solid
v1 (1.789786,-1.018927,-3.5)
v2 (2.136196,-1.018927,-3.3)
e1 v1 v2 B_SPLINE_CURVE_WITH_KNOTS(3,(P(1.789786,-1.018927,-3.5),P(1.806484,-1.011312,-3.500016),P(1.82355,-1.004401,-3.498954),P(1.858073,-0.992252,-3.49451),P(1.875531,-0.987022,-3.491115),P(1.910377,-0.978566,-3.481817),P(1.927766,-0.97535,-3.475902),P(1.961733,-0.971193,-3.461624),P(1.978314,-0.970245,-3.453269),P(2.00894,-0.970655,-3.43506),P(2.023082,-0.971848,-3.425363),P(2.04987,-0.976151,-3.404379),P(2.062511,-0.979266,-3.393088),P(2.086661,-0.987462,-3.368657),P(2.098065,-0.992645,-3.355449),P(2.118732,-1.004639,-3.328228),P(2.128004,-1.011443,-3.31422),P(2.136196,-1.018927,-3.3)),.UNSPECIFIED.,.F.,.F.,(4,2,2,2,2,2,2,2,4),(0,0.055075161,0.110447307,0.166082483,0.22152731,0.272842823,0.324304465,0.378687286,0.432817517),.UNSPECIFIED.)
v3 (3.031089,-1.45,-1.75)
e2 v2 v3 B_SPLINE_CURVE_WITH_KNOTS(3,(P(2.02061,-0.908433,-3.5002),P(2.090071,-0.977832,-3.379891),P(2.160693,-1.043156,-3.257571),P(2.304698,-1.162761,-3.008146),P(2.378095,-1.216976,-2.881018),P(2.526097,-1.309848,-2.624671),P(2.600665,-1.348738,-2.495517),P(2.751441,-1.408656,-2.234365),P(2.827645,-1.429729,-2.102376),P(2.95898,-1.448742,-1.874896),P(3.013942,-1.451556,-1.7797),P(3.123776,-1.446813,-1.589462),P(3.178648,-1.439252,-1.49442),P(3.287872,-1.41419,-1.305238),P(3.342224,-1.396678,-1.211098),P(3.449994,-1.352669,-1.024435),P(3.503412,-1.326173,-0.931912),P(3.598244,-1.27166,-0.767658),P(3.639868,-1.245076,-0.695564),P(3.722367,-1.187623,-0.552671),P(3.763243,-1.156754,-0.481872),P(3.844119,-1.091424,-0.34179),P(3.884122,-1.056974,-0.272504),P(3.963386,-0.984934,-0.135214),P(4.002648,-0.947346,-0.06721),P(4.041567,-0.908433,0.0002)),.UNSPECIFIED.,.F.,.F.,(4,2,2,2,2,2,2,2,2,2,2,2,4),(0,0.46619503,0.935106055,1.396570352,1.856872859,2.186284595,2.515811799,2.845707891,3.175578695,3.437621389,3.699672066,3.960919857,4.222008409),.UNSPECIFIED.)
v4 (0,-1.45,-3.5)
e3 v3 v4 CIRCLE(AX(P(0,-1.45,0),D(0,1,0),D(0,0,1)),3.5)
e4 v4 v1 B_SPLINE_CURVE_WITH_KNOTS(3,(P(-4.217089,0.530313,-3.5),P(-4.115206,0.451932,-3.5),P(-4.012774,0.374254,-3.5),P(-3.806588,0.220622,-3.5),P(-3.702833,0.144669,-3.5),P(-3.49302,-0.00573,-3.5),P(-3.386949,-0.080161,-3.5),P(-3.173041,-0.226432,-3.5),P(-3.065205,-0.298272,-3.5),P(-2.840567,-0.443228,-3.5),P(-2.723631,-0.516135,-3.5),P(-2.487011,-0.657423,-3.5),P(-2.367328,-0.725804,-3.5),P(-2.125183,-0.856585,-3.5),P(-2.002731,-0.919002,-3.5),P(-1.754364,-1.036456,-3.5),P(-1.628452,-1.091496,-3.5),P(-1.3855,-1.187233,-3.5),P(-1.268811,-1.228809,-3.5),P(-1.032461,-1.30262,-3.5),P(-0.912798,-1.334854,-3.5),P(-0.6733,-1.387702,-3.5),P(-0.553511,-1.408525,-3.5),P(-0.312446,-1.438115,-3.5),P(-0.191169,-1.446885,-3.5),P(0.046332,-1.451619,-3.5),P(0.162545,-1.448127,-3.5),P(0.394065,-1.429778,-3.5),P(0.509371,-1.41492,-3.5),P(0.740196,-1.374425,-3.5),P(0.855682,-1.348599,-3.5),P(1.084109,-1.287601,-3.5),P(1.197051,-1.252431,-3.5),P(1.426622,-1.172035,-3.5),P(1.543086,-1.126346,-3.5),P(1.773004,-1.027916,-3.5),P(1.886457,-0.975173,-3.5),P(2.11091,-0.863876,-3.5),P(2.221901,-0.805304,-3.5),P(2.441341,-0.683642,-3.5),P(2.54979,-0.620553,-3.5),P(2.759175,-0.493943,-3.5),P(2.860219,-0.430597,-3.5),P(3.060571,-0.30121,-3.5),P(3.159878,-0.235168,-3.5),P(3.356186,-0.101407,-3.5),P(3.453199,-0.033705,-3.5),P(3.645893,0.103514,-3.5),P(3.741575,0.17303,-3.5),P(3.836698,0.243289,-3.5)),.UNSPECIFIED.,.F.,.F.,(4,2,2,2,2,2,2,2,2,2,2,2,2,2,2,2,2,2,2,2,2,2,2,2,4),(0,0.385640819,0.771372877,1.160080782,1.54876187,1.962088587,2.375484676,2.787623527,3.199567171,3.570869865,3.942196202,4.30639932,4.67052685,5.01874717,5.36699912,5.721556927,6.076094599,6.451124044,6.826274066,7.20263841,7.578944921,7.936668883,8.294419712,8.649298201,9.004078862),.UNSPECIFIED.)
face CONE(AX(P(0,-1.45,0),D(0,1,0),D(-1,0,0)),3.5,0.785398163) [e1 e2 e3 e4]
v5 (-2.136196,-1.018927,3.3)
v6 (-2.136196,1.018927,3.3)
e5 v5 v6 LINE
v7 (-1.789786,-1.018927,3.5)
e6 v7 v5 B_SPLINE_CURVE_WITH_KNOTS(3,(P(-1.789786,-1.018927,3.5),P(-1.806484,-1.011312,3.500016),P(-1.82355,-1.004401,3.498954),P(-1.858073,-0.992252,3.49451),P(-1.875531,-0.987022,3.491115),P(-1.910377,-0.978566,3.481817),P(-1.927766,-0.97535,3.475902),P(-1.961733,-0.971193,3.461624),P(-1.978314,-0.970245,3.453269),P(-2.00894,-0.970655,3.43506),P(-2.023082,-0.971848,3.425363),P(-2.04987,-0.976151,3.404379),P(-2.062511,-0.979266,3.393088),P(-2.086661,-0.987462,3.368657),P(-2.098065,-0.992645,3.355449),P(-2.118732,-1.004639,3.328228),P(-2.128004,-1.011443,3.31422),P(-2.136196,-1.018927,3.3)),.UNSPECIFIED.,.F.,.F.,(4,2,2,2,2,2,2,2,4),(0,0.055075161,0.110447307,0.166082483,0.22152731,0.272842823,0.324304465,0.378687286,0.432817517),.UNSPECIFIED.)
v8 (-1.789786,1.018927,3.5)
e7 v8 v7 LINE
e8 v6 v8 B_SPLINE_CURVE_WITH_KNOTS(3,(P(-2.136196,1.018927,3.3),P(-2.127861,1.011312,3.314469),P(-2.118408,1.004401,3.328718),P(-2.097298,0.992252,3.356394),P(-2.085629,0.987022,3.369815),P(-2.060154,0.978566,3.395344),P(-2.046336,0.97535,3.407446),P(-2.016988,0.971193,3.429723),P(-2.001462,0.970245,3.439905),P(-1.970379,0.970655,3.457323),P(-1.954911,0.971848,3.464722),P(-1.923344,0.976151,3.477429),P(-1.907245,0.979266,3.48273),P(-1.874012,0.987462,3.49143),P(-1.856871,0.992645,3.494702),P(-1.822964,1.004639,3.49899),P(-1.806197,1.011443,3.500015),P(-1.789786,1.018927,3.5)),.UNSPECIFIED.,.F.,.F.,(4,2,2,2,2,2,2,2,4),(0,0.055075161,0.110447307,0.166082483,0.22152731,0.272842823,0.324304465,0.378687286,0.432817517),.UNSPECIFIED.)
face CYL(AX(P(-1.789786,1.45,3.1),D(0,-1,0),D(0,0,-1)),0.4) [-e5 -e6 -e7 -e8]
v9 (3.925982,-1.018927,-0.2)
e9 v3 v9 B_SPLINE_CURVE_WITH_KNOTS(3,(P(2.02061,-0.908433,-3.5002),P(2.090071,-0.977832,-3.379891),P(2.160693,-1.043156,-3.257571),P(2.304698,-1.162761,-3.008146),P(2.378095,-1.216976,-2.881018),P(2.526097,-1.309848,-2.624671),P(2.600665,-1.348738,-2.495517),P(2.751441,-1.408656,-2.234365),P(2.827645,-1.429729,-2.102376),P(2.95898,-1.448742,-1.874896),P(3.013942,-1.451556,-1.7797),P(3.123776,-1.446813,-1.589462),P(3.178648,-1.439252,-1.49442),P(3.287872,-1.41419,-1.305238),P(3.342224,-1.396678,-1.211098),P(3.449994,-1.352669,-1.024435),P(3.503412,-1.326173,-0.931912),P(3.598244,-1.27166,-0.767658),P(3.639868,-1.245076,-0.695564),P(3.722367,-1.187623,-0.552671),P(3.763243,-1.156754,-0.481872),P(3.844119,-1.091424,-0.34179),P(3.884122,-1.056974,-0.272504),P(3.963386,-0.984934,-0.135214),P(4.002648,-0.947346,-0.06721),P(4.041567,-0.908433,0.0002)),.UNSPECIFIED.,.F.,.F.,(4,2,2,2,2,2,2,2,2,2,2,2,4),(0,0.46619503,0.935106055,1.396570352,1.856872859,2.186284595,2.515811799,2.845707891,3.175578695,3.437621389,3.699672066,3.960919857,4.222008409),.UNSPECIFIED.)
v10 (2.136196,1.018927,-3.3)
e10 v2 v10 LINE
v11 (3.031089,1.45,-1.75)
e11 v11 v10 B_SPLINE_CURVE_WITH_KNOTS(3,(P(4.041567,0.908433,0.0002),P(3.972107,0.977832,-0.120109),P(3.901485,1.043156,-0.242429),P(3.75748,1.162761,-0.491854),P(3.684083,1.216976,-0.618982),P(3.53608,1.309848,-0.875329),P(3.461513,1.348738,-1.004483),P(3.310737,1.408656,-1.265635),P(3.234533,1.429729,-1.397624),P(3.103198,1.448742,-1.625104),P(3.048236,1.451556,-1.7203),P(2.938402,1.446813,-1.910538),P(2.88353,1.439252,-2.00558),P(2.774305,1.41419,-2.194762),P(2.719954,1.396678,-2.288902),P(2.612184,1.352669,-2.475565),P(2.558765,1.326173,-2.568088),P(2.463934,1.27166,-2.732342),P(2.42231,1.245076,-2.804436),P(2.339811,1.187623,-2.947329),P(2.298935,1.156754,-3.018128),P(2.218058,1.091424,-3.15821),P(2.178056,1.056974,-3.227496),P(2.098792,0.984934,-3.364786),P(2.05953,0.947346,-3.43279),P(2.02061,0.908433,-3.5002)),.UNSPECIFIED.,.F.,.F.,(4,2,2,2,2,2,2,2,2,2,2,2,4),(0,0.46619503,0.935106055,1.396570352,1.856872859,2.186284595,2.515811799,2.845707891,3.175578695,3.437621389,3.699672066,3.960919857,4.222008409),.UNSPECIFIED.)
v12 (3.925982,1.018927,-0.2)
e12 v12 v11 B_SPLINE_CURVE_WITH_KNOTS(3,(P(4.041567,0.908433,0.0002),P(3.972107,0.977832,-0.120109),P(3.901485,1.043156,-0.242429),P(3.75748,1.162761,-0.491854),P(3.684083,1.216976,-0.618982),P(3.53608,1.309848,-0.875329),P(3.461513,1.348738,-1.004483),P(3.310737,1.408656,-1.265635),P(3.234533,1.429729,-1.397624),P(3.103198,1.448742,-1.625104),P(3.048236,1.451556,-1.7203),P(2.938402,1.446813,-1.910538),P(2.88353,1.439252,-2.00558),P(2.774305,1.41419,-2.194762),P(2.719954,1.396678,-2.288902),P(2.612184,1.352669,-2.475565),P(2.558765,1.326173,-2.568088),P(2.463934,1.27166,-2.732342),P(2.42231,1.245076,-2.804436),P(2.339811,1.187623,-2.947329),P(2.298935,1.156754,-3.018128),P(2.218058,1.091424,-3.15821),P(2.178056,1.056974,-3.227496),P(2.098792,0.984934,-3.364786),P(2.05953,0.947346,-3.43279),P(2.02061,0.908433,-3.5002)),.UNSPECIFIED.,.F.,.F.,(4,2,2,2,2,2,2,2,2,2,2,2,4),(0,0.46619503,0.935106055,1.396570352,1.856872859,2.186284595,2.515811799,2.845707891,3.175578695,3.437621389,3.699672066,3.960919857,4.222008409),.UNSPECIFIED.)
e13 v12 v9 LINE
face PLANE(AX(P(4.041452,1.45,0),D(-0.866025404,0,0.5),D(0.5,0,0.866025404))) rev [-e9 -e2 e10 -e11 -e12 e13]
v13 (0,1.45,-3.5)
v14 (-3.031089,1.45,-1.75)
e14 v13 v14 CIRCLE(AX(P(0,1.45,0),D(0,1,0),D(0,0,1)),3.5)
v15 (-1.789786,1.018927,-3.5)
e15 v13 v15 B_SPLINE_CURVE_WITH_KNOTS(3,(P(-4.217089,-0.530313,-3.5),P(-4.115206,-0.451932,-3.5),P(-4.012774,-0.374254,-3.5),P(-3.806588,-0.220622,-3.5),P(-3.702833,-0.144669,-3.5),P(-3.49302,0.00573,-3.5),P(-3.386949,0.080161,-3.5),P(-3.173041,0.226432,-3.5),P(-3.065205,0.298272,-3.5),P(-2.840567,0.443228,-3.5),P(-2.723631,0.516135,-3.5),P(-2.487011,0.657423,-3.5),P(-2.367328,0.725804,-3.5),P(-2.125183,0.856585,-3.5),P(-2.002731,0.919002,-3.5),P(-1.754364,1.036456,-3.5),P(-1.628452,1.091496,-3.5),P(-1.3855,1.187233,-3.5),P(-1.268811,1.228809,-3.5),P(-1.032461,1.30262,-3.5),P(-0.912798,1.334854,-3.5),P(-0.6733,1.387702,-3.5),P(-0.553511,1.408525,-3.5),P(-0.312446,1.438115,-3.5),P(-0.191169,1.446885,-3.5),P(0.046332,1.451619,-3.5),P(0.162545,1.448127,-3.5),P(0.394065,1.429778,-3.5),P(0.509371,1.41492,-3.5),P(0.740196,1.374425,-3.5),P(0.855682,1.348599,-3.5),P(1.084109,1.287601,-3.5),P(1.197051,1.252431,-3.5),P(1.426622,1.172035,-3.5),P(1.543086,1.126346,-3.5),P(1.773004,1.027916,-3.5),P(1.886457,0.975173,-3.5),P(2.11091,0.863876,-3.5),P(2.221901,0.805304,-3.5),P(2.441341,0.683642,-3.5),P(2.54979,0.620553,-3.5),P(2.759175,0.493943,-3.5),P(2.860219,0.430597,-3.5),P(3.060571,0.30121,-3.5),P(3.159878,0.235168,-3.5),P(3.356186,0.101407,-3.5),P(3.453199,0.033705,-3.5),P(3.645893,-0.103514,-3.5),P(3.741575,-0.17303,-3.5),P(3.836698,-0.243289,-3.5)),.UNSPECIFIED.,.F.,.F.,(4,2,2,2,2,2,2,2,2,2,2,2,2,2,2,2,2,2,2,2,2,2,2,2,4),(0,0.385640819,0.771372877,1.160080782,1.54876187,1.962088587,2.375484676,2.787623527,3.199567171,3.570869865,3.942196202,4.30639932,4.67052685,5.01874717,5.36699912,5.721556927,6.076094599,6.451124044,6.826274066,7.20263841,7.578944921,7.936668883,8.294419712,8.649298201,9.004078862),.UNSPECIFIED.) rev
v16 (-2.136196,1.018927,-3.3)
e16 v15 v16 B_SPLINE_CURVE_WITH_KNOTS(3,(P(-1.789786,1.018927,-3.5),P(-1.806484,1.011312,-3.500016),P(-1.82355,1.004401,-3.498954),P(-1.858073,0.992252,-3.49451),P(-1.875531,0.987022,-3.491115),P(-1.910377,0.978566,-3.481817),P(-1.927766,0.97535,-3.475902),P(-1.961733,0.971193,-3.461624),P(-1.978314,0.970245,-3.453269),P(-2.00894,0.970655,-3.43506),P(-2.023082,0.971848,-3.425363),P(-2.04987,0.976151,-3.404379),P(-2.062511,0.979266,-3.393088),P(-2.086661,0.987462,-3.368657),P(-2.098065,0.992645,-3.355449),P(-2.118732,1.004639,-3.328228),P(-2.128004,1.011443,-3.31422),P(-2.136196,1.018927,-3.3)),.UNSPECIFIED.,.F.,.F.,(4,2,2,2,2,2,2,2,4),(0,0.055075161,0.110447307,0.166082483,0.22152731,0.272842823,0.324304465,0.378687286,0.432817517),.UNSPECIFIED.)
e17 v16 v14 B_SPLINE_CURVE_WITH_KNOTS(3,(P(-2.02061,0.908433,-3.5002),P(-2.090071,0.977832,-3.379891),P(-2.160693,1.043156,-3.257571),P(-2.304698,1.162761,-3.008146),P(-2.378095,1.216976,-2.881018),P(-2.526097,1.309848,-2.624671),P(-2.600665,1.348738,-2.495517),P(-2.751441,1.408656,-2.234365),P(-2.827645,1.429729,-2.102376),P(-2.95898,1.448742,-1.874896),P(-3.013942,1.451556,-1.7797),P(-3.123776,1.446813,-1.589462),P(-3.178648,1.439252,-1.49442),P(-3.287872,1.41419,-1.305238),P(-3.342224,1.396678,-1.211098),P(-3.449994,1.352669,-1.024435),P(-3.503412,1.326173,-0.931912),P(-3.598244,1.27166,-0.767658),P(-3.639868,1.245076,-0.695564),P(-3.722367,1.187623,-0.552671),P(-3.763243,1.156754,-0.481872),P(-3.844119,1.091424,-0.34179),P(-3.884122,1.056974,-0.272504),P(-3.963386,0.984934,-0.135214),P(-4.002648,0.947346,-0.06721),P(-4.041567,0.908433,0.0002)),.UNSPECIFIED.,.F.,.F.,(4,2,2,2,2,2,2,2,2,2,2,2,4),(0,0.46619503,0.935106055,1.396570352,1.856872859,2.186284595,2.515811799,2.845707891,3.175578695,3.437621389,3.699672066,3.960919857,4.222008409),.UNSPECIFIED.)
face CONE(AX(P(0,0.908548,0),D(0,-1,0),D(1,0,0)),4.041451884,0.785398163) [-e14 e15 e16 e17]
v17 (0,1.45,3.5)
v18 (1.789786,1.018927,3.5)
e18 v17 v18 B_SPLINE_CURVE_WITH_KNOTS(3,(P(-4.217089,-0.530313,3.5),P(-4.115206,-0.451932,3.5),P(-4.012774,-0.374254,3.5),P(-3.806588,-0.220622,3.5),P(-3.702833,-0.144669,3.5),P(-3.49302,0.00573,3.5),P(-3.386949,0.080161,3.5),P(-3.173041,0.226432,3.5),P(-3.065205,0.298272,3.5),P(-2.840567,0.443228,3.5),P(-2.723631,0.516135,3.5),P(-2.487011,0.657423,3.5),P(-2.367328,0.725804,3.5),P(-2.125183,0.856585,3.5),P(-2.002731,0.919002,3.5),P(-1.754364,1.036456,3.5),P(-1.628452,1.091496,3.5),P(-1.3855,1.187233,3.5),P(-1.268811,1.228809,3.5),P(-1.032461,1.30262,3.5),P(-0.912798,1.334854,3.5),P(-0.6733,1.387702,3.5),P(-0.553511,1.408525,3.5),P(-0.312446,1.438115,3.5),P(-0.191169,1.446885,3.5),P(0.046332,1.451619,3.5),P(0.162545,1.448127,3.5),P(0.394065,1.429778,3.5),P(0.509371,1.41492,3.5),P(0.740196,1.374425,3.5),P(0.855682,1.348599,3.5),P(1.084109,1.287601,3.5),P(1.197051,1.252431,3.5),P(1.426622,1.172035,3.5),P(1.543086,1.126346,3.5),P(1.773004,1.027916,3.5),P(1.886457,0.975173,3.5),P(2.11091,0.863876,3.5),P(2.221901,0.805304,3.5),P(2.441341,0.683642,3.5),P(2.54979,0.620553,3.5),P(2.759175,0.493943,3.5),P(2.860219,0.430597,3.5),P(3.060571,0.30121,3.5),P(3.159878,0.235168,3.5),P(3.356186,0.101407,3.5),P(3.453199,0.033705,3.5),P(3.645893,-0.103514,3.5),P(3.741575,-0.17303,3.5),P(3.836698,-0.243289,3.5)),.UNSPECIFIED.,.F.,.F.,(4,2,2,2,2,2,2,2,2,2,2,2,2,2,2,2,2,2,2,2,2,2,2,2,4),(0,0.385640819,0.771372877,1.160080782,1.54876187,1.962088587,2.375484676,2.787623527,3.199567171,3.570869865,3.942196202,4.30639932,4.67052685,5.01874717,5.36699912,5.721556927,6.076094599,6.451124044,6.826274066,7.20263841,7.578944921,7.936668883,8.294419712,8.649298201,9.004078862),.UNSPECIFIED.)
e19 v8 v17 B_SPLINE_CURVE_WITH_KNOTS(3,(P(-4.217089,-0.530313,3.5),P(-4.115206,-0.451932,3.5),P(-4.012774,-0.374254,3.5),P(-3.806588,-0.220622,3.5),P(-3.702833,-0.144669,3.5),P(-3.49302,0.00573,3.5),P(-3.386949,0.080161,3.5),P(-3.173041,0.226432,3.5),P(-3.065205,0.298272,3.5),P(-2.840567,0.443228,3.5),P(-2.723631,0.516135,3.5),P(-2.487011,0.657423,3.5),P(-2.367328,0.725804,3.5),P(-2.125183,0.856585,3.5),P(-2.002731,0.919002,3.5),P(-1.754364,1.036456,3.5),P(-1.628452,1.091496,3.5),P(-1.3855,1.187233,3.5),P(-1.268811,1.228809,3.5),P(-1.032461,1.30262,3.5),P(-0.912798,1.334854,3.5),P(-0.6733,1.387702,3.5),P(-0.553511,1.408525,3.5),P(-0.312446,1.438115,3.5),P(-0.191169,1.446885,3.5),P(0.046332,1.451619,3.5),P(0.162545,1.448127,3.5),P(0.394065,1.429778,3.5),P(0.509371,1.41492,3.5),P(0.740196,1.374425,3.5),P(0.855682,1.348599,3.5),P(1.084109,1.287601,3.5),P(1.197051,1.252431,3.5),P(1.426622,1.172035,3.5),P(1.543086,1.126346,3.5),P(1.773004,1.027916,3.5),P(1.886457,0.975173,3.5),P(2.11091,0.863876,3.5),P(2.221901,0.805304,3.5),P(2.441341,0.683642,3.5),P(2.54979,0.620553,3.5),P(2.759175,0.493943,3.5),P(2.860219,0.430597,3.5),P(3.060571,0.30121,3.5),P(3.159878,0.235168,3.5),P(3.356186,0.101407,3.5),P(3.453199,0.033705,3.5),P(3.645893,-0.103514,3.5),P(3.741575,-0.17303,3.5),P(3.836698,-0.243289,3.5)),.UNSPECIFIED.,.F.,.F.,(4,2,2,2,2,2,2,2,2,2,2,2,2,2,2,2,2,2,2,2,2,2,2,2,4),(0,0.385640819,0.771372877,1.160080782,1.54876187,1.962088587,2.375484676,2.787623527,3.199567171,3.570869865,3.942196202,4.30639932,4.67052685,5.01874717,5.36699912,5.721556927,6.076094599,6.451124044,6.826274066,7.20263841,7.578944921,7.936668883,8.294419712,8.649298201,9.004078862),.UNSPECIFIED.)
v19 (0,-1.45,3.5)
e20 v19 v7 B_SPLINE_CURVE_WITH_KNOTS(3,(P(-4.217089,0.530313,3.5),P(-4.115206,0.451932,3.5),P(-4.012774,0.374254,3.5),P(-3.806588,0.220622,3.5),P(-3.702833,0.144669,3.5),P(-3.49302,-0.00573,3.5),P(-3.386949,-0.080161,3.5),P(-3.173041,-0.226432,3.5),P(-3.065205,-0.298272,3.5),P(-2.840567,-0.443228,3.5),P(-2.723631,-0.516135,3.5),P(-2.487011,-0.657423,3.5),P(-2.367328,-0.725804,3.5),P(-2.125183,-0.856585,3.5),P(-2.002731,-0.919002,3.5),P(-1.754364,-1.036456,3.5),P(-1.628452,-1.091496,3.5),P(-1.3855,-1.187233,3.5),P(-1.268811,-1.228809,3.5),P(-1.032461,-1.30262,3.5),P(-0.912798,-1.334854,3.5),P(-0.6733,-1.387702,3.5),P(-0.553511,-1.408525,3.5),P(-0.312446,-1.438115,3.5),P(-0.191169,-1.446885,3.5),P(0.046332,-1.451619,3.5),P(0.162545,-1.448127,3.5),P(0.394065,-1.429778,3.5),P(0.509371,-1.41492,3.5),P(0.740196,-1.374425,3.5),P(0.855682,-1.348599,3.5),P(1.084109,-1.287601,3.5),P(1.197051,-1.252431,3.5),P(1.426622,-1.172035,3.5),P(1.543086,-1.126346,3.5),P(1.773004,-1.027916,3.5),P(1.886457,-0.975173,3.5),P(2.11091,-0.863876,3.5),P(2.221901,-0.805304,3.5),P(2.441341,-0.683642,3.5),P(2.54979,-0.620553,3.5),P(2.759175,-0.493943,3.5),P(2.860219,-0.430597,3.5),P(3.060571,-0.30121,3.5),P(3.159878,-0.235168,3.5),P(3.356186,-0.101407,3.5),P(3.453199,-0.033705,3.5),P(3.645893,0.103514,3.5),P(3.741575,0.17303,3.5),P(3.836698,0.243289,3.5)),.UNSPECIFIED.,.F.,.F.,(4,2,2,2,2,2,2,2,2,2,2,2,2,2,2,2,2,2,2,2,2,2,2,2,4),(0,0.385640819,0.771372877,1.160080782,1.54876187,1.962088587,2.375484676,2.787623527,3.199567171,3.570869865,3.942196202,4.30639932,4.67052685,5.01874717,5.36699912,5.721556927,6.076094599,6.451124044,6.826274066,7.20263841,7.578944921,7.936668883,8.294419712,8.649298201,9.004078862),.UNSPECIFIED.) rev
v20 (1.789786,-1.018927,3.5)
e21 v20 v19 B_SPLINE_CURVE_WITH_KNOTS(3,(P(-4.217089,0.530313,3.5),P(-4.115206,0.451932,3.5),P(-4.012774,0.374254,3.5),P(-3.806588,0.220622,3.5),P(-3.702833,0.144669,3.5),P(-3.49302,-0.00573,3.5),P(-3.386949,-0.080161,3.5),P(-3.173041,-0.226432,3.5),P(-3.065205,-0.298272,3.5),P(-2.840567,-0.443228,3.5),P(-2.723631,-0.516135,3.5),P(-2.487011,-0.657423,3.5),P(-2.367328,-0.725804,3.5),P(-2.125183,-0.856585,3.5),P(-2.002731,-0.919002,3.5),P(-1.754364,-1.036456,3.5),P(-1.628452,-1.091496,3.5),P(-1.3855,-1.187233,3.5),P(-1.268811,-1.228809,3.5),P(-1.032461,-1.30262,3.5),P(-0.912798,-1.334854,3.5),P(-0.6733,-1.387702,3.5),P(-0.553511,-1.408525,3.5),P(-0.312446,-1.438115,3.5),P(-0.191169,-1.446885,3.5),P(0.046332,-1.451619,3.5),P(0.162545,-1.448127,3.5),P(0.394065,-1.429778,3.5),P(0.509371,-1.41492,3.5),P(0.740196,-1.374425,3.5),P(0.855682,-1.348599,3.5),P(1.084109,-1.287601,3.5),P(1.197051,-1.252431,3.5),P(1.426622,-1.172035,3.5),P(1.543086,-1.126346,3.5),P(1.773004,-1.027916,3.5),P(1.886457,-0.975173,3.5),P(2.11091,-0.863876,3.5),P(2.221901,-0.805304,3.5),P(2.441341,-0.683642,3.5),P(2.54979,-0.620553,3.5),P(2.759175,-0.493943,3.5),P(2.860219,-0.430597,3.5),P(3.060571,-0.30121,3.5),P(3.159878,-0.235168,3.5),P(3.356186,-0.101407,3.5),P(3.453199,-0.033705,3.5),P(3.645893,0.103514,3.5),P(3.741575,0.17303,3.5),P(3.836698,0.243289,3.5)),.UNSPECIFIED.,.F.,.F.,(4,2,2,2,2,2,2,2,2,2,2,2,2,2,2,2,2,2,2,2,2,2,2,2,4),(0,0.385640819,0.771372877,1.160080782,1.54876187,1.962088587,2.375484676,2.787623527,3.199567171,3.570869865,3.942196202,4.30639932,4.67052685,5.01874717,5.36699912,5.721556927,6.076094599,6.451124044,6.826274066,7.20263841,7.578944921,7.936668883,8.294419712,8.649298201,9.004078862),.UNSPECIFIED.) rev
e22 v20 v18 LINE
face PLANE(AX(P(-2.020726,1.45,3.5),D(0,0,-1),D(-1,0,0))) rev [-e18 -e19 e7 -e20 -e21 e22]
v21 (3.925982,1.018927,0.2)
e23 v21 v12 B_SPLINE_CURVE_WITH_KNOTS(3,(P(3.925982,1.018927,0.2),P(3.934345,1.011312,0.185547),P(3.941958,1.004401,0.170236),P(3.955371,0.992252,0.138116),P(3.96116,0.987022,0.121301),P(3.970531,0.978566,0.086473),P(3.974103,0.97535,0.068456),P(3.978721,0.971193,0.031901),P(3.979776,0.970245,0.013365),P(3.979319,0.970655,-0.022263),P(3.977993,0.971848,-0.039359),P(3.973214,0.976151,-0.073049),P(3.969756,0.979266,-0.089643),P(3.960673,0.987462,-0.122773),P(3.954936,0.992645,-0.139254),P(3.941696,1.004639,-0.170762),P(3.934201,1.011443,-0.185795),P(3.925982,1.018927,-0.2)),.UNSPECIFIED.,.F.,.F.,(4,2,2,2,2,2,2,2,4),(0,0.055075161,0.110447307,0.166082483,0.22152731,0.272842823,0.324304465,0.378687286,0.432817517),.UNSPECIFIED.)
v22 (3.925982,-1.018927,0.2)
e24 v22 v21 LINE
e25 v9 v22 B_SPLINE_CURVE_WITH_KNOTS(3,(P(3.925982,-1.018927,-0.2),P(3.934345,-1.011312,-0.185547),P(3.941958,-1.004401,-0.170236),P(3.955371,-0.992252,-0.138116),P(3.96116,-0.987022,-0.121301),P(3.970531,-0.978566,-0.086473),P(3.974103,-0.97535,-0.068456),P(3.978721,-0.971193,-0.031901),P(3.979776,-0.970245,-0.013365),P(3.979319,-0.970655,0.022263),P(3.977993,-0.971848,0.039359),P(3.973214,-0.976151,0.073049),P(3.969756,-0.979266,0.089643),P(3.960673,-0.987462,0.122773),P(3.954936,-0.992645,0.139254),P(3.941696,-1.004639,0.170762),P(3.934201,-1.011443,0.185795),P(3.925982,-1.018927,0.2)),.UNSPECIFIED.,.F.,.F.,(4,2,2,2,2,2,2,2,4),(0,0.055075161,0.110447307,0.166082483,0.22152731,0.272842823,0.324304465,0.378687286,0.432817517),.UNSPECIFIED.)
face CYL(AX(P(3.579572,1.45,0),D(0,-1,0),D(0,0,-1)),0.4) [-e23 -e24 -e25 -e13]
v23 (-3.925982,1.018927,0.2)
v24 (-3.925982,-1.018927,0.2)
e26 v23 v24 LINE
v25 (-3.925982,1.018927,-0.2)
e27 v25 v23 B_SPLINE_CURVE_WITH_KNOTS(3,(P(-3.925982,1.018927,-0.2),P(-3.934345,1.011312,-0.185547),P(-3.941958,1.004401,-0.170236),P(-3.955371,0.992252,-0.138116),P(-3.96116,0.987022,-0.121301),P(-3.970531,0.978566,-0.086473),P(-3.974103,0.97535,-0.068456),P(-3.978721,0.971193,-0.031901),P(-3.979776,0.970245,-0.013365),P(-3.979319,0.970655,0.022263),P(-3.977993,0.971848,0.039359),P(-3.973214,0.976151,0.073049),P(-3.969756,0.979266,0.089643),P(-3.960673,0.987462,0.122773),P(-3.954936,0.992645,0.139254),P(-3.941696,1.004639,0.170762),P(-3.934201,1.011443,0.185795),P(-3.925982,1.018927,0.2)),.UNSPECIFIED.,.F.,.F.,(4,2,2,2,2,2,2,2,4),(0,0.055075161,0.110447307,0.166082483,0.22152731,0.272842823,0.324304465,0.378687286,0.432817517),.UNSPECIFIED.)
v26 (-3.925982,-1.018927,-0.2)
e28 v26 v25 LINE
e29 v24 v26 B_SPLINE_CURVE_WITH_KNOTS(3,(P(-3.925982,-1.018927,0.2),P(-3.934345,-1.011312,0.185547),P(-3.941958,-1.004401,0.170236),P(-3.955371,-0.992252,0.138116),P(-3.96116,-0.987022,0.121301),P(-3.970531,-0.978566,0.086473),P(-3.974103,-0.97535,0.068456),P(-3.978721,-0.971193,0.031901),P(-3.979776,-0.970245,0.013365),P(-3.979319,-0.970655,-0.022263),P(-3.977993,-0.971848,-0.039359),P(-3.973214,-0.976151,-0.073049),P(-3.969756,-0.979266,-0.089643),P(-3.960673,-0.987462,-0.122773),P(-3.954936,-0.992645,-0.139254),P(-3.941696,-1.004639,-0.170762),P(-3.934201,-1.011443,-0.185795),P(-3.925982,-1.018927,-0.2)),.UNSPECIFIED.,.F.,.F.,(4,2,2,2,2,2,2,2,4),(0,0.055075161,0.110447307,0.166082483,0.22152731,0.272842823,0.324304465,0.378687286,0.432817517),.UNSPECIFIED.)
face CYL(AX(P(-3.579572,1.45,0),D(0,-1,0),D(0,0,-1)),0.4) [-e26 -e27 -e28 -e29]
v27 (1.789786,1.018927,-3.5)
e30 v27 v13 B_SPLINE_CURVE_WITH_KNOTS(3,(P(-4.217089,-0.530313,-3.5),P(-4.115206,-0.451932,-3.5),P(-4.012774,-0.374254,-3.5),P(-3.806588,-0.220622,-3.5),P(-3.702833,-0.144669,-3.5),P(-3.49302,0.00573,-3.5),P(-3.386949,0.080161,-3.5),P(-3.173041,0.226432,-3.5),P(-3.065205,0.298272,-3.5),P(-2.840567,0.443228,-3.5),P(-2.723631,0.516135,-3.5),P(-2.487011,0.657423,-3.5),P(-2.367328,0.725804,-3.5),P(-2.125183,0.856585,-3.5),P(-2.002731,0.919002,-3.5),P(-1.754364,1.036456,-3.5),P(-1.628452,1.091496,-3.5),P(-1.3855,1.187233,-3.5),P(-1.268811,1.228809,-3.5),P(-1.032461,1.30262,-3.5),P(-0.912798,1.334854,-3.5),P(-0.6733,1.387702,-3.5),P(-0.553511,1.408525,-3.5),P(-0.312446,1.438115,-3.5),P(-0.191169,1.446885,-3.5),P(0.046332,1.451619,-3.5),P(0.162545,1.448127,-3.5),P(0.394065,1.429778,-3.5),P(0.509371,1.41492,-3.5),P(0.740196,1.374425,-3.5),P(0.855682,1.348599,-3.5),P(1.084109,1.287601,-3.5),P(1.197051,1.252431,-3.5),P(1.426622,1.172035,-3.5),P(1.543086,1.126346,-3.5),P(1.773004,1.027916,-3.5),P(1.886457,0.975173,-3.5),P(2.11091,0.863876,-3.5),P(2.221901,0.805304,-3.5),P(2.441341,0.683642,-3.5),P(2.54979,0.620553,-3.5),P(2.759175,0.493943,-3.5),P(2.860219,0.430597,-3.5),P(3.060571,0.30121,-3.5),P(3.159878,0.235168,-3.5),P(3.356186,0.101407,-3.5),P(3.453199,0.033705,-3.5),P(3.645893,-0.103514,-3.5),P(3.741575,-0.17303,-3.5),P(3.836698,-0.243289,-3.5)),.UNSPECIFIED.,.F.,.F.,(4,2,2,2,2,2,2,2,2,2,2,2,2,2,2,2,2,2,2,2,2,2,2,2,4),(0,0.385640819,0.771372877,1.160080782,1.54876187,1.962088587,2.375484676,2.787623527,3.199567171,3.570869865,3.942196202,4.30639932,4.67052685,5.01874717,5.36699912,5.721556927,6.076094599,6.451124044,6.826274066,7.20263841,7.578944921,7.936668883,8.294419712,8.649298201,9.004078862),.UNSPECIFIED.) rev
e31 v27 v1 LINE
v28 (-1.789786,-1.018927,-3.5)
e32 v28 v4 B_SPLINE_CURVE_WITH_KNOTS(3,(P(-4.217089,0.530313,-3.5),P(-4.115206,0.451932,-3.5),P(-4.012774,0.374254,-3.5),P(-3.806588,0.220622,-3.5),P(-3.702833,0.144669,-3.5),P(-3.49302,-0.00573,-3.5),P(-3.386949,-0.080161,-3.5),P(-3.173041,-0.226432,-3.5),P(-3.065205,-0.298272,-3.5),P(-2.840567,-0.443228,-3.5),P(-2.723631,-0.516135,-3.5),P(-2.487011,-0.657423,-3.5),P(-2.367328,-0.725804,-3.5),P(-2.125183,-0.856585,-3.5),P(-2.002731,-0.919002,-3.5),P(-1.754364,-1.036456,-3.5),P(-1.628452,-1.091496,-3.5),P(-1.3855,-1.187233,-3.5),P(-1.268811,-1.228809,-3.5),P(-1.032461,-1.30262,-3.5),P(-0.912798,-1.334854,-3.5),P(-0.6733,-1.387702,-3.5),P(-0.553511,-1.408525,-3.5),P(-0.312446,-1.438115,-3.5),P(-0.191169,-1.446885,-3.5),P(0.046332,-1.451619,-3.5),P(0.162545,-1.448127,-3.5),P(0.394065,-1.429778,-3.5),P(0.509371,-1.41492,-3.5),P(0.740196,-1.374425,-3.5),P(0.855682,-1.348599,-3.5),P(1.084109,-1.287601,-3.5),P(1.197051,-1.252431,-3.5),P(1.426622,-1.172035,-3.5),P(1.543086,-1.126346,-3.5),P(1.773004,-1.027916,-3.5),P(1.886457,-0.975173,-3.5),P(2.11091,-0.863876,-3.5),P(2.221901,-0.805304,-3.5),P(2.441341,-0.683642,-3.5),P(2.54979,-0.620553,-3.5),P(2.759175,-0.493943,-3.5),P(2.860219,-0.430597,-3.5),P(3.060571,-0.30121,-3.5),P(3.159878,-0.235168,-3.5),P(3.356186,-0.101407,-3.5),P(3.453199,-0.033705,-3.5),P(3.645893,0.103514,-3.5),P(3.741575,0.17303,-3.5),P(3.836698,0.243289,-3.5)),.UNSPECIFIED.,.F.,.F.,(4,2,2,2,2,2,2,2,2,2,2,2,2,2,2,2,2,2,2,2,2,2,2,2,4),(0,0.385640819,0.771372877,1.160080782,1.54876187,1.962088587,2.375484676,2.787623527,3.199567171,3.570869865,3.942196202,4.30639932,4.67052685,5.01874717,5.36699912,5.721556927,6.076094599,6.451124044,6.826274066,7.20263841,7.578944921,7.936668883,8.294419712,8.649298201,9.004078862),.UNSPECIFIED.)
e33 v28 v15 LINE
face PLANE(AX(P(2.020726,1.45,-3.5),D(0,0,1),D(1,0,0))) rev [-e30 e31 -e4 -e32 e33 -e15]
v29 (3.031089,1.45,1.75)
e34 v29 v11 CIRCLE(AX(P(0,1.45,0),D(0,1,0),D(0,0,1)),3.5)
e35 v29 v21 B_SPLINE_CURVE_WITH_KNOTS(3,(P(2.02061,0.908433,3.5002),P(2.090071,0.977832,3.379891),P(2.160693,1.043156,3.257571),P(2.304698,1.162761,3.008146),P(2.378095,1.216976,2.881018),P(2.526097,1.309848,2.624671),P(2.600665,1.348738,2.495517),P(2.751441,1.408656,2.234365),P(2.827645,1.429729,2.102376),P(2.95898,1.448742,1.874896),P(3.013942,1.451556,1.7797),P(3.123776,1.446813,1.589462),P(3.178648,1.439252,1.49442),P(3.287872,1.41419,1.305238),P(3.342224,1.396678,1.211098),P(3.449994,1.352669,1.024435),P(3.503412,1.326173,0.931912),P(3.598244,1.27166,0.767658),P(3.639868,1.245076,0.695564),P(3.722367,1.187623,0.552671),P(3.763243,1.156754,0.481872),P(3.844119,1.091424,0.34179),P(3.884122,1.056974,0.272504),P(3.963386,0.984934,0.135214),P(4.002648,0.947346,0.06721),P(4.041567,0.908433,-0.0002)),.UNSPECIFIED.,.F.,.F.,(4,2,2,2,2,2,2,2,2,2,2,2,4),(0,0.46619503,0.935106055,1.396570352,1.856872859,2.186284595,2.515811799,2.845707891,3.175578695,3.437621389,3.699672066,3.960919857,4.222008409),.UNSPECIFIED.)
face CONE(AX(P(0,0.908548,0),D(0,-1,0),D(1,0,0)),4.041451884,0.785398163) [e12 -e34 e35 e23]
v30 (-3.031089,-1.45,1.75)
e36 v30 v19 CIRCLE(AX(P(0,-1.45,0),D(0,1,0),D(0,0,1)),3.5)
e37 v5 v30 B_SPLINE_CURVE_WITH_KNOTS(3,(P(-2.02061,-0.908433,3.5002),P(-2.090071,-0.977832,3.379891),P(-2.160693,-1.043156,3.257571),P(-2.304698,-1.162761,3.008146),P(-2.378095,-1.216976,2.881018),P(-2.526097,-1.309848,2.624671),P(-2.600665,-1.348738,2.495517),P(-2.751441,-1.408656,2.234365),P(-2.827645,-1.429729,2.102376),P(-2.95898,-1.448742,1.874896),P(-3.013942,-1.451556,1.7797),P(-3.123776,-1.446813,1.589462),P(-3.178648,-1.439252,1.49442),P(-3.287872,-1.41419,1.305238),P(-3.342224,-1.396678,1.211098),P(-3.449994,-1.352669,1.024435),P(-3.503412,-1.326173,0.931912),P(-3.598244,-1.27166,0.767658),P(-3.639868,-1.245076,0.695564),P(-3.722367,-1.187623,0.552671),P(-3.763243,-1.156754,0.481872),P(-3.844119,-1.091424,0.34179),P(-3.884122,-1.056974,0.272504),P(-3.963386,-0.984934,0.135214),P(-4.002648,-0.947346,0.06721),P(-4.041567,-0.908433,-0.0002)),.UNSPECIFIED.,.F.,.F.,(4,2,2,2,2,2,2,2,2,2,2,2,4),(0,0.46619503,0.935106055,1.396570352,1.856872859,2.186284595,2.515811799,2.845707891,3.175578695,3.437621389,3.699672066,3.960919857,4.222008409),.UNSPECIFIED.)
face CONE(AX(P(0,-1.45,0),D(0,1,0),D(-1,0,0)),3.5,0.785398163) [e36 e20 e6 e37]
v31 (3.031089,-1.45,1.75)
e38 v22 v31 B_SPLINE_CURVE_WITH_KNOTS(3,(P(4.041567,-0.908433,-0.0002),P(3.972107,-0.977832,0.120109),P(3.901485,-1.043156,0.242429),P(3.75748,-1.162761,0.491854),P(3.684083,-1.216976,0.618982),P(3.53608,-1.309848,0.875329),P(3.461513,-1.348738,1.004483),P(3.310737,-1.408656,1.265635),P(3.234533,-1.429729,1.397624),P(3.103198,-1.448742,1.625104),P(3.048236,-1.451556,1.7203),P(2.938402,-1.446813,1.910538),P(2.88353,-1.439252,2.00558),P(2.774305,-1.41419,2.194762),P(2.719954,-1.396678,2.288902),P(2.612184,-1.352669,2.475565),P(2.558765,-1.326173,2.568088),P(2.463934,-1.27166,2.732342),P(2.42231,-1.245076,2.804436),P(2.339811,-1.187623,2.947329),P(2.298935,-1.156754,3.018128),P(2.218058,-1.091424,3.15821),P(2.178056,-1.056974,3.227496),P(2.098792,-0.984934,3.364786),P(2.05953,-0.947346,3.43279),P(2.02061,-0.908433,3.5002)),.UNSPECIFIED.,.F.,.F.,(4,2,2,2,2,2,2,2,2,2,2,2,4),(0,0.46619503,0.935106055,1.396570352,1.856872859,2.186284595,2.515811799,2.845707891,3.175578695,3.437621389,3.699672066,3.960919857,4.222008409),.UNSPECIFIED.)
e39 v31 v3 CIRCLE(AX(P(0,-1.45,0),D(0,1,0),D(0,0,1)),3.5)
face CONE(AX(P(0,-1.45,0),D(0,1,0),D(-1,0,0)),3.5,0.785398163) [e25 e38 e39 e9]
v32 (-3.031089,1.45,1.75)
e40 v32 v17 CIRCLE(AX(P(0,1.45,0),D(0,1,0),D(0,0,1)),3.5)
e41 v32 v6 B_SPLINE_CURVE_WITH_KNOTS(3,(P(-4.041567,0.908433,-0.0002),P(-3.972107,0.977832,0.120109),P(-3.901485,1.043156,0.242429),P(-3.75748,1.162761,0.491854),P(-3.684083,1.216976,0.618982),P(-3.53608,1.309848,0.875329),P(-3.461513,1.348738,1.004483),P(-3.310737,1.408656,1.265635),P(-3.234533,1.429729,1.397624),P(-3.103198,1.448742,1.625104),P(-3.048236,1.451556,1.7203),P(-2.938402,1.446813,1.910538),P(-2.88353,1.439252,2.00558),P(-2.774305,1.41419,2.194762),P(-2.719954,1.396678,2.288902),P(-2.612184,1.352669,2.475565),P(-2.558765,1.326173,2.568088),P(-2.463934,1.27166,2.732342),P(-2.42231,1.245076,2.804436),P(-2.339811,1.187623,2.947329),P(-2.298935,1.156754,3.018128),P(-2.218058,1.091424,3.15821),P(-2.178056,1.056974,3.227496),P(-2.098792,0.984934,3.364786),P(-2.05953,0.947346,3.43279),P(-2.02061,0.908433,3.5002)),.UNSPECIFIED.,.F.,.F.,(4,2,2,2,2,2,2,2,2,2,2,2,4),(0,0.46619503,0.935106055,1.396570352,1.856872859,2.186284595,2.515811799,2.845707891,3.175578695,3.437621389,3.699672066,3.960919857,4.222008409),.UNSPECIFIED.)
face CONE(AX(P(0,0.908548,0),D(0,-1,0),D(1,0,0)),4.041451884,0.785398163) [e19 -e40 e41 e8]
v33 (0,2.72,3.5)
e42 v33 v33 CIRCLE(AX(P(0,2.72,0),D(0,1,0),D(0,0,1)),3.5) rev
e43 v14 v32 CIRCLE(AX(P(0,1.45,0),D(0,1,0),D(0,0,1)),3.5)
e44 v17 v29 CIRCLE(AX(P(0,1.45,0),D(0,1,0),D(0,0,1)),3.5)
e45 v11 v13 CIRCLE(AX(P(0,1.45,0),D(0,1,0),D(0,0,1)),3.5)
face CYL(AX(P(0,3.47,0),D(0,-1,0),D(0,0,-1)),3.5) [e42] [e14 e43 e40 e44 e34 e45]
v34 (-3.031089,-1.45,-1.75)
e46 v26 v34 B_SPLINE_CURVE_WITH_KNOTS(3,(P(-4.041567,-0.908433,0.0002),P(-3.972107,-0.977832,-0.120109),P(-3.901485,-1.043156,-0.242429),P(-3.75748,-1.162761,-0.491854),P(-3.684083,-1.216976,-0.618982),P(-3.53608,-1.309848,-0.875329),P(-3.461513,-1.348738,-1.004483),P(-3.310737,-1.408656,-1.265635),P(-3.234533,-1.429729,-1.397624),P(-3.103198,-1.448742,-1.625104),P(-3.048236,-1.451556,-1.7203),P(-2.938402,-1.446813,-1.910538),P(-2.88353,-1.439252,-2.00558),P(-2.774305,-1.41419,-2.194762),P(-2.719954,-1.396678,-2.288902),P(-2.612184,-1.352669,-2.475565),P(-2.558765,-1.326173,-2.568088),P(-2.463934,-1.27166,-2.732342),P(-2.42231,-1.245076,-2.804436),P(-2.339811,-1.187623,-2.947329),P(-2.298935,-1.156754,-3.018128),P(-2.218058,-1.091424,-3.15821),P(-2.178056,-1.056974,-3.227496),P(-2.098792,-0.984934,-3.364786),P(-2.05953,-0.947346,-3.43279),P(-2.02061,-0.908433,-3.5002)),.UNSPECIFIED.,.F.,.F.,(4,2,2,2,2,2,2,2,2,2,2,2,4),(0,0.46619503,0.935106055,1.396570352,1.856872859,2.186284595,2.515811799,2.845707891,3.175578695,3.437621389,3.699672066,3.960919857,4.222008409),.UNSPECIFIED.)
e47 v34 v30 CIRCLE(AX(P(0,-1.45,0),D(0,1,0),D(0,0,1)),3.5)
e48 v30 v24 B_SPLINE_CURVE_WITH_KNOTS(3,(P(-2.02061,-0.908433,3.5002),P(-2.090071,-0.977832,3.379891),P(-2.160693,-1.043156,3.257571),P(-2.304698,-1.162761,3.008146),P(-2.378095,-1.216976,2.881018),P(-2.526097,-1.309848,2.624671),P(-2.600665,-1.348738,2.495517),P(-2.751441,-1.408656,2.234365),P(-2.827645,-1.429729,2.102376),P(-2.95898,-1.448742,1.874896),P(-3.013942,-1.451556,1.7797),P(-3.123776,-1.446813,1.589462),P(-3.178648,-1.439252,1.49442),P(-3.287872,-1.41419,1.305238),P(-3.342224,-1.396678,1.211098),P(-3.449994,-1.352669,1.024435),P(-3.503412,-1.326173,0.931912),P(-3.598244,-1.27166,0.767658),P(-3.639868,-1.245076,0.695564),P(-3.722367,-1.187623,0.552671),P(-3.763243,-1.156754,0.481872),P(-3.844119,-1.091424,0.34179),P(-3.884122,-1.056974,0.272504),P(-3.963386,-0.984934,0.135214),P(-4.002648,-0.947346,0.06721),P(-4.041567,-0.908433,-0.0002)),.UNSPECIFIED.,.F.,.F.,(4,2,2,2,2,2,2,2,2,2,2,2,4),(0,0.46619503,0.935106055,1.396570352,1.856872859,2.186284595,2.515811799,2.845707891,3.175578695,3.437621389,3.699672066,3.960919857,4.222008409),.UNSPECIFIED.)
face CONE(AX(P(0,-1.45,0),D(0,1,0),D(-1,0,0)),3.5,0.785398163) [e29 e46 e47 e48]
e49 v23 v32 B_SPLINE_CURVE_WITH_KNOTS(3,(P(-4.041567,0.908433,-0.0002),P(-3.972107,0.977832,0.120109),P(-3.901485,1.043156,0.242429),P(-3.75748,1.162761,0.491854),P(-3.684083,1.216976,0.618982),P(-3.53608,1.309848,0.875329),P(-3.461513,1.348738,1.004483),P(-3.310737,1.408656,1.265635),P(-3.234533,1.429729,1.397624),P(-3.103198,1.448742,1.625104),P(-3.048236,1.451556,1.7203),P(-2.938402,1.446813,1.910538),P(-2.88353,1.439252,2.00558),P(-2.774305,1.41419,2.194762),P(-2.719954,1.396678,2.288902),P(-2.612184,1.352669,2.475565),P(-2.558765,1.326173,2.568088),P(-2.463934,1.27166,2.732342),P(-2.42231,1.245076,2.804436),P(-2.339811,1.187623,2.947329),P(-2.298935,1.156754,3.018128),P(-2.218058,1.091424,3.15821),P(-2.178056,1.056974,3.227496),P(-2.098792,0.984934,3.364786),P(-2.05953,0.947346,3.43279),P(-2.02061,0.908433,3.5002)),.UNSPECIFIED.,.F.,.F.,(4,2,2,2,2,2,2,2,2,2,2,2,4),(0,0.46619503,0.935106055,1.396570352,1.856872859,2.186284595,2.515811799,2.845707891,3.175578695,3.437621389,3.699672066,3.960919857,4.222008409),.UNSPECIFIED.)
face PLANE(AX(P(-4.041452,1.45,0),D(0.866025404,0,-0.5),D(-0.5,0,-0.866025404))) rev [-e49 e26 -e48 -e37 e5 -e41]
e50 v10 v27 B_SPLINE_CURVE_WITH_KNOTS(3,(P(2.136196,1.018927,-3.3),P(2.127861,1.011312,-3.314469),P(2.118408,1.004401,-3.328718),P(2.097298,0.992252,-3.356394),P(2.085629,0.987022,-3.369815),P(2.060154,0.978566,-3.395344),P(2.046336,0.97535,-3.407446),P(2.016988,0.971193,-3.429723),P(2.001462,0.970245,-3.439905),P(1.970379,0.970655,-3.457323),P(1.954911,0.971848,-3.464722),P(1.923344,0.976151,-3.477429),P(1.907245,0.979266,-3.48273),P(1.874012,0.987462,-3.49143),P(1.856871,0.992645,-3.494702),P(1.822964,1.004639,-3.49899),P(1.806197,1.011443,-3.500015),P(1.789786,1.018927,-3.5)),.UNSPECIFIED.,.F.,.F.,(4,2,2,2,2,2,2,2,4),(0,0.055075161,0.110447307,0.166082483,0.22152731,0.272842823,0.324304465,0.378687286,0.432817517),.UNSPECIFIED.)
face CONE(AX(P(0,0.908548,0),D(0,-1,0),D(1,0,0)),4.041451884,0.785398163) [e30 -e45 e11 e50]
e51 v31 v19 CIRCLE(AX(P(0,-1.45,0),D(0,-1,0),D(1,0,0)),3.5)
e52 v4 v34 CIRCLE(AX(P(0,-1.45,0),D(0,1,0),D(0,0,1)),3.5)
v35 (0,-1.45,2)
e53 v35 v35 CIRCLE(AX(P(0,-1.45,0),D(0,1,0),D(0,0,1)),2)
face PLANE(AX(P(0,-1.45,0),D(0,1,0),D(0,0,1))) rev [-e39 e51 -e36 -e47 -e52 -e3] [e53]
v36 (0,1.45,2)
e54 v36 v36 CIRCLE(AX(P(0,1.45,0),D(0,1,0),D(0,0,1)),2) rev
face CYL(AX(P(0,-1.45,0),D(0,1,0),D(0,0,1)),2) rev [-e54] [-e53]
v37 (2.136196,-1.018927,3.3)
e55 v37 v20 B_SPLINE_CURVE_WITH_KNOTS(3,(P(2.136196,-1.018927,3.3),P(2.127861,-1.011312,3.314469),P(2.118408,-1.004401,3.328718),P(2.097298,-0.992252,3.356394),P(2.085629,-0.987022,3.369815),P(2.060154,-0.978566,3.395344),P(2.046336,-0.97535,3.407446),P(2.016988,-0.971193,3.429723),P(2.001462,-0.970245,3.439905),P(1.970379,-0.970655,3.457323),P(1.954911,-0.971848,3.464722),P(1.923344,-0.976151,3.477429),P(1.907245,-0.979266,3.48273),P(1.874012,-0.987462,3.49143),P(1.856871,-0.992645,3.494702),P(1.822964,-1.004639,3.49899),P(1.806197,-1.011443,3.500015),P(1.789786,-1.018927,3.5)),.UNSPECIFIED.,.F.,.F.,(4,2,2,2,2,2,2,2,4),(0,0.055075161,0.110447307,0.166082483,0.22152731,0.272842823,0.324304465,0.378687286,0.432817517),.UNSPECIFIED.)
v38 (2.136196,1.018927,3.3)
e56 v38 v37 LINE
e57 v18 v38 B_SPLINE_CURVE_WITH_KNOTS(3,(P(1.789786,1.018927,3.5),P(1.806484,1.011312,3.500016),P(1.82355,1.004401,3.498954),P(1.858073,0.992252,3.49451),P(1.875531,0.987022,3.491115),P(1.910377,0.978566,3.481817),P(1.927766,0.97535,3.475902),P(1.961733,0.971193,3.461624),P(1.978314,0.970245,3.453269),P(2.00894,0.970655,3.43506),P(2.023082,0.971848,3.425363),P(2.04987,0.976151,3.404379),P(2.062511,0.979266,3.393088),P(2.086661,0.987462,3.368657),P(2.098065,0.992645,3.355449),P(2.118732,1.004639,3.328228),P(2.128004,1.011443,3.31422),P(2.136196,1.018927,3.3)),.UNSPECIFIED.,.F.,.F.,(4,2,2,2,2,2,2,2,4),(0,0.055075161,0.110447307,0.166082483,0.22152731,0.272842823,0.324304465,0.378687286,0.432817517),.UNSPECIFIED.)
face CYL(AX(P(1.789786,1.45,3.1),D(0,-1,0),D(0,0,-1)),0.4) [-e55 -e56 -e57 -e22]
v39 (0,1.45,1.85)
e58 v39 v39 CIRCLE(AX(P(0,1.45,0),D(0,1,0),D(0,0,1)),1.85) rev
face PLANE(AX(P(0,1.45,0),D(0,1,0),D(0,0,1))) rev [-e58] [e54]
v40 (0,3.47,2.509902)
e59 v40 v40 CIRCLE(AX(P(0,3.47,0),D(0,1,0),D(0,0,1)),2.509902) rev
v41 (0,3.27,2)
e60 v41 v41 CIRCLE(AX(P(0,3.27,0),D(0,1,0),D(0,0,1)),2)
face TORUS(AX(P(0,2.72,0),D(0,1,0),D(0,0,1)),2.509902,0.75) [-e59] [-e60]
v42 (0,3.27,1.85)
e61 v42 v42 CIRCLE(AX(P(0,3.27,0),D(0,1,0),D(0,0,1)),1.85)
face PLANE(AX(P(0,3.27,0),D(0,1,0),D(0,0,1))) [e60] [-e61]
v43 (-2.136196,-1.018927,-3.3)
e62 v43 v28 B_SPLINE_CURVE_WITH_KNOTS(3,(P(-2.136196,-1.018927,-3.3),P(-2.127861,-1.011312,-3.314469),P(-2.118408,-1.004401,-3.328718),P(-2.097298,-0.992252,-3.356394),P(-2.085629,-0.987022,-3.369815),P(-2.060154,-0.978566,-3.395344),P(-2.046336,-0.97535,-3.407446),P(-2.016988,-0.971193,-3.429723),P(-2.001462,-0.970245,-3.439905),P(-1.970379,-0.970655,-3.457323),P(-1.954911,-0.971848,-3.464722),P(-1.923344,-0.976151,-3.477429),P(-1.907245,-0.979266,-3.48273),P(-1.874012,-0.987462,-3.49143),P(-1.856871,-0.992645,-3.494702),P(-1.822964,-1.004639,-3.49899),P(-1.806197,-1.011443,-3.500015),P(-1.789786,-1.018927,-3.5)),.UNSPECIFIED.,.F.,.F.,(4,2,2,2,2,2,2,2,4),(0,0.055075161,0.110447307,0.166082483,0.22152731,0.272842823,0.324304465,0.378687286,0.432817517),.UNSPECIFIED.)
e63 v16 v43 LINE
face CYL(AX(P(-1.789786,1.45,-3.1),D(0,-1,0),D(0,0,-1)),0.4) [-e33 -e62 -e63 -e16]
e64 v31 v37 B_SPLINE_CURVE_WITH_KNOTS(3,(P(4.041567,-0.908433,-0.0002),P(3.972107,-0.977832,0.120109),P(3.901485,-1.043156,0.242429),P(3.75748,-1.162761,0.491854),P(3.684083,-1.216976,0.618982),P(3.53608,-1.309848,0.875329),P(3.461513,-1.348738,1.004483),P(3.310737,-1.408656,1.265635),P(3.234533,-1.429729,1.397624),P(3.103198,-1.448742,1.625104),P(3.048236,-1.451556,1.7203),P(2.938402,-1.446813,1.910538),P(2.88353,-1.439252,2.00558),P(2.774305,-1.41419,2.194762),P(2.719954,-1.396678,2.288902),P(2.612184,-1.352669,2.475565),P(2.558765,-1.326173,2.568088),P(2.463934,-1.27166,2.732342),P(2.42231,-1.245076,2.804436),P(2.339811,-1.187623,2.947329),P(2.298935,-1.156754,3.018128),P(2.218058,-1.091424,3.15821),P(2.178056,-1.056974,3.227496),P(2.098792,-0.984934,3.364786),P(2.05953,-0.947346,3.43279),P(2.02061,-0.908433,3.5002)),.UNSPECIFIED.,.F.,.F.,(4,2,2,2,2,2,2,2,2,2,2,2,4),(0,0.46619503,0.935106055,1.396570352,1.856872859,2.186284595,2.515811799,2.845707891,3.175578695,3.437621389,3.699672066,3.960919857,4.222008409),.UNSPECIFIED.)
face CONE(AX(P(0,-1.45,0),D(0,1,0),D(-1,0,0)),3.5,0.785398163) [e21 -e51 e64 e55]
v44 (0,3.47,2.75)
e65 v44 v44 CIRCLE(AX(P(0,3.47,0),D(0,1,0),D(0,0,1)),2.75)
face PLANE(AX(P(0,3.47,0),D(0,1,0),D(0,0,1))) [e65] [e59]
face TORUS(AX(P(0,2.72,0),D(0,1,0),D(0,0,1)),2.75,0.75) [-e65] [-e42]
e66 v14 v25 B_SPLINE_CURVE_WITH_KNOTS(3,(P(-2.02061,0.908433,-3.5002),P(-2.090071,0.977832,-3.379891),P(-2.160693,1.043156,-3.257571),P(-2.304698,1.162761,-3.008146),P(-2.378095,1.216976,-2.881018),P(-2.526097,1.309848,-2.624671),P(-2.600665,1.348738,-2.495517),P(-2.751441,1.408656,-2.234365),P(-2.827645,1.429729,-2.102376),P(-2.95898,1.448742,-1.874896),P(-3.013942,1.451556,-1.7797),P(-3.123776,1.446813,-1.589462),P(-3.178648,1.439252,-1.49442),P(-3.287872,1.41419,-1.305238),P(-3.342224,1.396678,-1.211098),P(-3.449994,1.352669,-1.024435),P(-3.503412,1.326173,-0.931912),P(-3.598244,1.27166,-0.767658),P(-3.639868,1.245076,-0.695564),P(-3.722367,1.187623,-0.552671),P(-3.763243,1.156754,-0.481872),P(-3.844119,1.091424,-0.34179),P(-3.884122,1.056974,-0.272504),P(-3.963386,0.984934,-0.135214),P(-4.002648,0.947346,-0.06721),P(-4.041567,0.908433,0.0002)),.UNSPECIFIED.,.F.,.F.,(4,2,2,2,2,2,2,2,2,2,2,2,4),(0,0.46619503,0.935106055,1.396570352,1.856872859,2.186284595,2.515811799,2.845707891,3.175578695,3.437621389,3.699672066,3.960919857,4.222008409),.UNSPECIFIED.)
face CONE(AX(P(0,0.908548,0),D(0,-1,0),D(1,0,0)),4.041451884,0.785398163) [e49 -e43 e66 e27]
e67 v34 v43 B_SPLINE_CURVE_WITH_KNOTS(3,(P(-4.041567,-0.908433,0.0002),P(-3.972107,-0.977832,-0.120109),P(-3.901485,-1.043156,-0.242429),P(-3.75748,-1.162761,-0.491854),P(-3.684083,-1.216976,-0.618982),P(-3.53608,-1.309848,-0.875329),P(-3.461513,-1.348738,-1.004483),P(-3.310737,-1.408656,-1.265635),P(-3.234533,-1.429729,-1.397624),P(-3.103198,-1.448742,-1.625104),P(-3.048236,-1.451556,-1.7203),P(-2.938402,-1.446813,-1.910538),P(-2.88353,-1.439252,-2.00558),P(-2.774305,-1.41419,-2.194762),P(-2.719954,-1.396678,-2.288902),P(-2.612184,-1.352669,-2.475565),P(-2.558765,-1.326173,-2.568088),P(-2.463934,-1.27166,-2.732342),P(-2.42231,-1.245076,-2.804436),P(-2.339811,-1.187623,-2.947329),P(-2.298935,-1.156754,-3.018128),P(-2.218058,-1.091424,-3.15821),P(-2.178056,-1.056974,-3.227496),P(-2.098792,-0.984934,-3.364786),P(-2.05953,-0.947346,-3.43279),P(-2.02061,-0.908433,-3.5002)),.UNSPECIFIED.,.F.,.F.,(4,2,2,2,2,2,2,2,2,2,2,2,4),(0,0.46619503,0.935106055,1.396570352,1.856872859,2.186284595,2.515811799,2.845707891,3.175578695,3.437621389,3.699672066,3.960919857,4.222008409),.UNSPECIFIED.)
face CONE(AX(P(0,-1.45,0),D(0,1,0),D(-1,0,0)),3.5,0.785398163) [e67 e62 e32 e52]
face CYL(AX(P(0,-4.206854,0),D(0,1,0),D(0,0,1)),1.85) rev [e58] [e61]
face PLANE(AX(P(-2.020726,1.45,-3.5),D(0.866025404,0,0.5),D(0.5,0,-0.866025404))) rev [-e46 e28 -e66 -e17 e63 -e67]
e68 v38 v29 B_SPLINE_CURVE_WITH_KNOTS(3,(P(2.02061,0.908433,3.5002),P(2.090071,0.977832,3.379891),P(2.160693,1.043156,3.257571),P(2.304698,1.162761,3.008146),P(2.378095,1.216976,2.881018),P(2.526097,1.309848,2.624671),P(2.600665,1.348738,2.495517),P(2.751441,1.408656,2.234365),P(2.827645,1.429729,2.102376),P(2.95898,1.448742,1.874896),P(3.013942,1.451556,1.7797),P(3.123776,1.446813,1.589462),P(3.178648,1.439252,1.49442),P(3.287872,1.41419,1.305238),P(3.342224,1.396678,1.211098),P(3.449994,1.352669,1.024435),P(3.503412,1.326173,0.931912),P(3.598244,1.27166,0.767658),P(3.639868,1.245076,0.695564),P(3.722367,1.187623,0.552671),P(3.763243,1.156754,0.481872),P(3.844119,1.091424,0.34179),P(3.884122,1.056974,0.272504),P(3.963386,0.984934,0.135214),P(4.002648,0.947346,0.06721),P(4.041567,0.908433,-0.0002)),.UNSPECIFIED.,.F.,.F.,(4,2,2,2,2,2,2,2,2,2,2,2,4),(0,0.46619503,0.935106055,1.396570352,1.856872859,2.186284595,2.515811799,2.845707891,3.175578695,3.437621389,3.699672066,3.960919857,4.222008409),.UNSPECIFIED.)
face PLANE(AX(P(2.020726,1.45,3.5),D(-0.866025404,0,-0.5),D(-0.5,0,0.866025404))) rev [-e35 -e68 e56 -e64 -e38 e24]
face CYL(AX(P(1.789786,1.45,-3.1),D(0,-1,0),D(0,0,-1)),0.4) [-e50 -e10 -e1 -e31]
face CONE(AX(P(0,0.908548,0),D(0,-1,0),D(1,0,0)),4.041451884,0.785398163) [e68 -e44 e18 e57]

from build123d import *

# Parameters (mm, degrees)
EXTRUDE_1_DEPTH     = 1.45
SKETCH_3_R          = 3.5
EXTRUDE_2_DEPTH     = 2.02
SKETCH_4_R          = 2
CUT_EXTRUDE_1_DEPTH = 8.265654364
EXTRUDE_START       = -0.2
SKETCH_5_R          = 2
SKETCH_5_R_2        = 1.85
EXTRUDE_3_DEPTH     = 1.82
FILLET_1_R          = 0.75
FILLET_3_R          = 0.4


with BuildPart() as part:
    # 草图1 → 凸台-拉伸1 (new, symmetric)
    with BuildSketch(Plane(origin=(0, 0, 0), x_dir=(1, 0, 0), z_dir=(0, 1, 0))):
        Polygon((4.041451884, 0), (2.020725942, 3.5), (-2.020725942, 3.5), (-4.041451884, 0), (-2.020725942, -3.5), (2.020725942, -3.5), align=None)
    extrude(amount=EXTRUDE_1_DEPTH, both=True)

    # 草图3 → 凸台-拉伸2 (add)
    with BuildSketch(Plane(origin=(0, 1.45, 0), x_dir=(1, 0, 0), z_dir=(0, 1, 0))):
        with Locations(Location((0, 0, 0), (0, 0, 270))):
            Circle(SKETCH_3_R)
    extrude(amount=EXTRUDE_2_DEPTH)

    # 草图4 → 切除-拉伸1 (cut, through all)
    with BuildSketch(Plane(origin=(0, 3.47, 0), x_dir=(1, 0, 0), z_dir=(0, 1, 0))):
        with Locations(Location((0, 0, 0), (0, 0, 270))):
            Circle(SKETCH_4_R)
    extrude(amount=-CUT_EXTRUDE_1_DEPTH, mode=Mode.SUBTRACT)

    # 草图5 → 凸台-拉伸3 (add)
    with BuildSketch(Plane(origin=(0, 3.47, 0), x_dir=(1, 0, 0), z_dir=(0, 1, 0)).offset(EXTRUDE_START)):
        with Locations(Location((0, 0, 0), (0, 0, 270))):
            Circle(SKETCH_5_R)
        with Locations(Location((0, 0, 0), (0, 0, 270))):
            Circle(SKETCH_5_R_2, mode=Mode.SUBTRACT)
    extrude(amount=-EXTRUDE_3_DEPTH)

    # 圆角1
    # the kernel refuses this fillet: 0.75 mm, written as the material it takes off along each edge
    with BuildSketch(Plane(origin=(0, 3.47, 0), x_dir=(0, 0, 1), z_dir=(-1, 0, 0))) as fillet_1_piece_1:
        with BuildLine():
            CenterArc((3.5 - FILLET_1_R, -FILLET_1_R), FILLET_1_R, 0, 90)
            Line((3.5 - FILLET_1_R, 0), (3.5 - FILLET_1_R, FILLET_1_R * 0.02))
            Line((3.5 - FILLET_1_R, FILLET_1_R * 0.02), (3.5 + FILLET_1_R * 0.02, FILLET_1_R * 0.02))
            Line((3.5 + FILLET_1_R * 0.02, FILLET_1_R * 0.02), (3.5 + FILLET_1_R * 0.02, -FILLET_1_R))
            Line((3.5 + FILLET_1_R * 0.02, -FILLET_1_R), (3.5, -FILLET_1_R))
        make_face()
    revolve(axis=Axis((0, 3.47, 0), (0, 1, 0)), mode=Mode.SUBTRACT)
    with BuildSketch(Plane(origin=(0, 3.47, 0), x_dir=(0, 0, 1), z_dir=(-1, 0, 0))) as fillet_1_piece_2:
        with BuildLine():
            CenterArc((2.509901951, -0.75), FILLET_1_R, 90, 42.833428066)
            Line((2, -0.2), (1.989801961, -0.189))
            ThreePointArc((1.989801961, -0.189), (1.985, -0.1), (1.985, 0))
            Line((1.985, 0), (2, 0.015))
            Line((2, 0.015), (2.509901951, 0.015))
            Line((2.509901951, 0.015), (2.509901951, 0))
        make_face()
    revolve(axis=Axis((0, 3.47, 0), (0, 1, 0)), mode=Mode.SUBTRACT)

    # 草图6 → 切除-旋转1 (revolve, cut)
    with BuildSketch(Plane.XY):
        Polygon((-4.041451884, 1.45), (-4.041451884, 0.908548116), (-3.5, 1.45), align=None)
        Polygon((-4.041451884, -1.45), (-4.041451884, -0.908548116), (-3.5, -1.45), align=None)
    revolve(axis=Axis((0, -1000, 0), (0, 1, 0)), mode=Mode.SUBTRACT)

    # 圆角3
    fillet_3_edges = [part.edges().sort_by_distance(p)[0] for p in [
        (-4.041451884, 0, 0),
        (-2.020725942, 0, -3.5),
        (2.020725942, 0, -3.5),
        (4.041451884, 0, 0),
        (2.020725942, 0, 3.5),
        (-2.020725942, 0, 3.5),
    ]]
    fillet(fillet_3_edges, radius=FILLET_3_R)


solid = part.part
